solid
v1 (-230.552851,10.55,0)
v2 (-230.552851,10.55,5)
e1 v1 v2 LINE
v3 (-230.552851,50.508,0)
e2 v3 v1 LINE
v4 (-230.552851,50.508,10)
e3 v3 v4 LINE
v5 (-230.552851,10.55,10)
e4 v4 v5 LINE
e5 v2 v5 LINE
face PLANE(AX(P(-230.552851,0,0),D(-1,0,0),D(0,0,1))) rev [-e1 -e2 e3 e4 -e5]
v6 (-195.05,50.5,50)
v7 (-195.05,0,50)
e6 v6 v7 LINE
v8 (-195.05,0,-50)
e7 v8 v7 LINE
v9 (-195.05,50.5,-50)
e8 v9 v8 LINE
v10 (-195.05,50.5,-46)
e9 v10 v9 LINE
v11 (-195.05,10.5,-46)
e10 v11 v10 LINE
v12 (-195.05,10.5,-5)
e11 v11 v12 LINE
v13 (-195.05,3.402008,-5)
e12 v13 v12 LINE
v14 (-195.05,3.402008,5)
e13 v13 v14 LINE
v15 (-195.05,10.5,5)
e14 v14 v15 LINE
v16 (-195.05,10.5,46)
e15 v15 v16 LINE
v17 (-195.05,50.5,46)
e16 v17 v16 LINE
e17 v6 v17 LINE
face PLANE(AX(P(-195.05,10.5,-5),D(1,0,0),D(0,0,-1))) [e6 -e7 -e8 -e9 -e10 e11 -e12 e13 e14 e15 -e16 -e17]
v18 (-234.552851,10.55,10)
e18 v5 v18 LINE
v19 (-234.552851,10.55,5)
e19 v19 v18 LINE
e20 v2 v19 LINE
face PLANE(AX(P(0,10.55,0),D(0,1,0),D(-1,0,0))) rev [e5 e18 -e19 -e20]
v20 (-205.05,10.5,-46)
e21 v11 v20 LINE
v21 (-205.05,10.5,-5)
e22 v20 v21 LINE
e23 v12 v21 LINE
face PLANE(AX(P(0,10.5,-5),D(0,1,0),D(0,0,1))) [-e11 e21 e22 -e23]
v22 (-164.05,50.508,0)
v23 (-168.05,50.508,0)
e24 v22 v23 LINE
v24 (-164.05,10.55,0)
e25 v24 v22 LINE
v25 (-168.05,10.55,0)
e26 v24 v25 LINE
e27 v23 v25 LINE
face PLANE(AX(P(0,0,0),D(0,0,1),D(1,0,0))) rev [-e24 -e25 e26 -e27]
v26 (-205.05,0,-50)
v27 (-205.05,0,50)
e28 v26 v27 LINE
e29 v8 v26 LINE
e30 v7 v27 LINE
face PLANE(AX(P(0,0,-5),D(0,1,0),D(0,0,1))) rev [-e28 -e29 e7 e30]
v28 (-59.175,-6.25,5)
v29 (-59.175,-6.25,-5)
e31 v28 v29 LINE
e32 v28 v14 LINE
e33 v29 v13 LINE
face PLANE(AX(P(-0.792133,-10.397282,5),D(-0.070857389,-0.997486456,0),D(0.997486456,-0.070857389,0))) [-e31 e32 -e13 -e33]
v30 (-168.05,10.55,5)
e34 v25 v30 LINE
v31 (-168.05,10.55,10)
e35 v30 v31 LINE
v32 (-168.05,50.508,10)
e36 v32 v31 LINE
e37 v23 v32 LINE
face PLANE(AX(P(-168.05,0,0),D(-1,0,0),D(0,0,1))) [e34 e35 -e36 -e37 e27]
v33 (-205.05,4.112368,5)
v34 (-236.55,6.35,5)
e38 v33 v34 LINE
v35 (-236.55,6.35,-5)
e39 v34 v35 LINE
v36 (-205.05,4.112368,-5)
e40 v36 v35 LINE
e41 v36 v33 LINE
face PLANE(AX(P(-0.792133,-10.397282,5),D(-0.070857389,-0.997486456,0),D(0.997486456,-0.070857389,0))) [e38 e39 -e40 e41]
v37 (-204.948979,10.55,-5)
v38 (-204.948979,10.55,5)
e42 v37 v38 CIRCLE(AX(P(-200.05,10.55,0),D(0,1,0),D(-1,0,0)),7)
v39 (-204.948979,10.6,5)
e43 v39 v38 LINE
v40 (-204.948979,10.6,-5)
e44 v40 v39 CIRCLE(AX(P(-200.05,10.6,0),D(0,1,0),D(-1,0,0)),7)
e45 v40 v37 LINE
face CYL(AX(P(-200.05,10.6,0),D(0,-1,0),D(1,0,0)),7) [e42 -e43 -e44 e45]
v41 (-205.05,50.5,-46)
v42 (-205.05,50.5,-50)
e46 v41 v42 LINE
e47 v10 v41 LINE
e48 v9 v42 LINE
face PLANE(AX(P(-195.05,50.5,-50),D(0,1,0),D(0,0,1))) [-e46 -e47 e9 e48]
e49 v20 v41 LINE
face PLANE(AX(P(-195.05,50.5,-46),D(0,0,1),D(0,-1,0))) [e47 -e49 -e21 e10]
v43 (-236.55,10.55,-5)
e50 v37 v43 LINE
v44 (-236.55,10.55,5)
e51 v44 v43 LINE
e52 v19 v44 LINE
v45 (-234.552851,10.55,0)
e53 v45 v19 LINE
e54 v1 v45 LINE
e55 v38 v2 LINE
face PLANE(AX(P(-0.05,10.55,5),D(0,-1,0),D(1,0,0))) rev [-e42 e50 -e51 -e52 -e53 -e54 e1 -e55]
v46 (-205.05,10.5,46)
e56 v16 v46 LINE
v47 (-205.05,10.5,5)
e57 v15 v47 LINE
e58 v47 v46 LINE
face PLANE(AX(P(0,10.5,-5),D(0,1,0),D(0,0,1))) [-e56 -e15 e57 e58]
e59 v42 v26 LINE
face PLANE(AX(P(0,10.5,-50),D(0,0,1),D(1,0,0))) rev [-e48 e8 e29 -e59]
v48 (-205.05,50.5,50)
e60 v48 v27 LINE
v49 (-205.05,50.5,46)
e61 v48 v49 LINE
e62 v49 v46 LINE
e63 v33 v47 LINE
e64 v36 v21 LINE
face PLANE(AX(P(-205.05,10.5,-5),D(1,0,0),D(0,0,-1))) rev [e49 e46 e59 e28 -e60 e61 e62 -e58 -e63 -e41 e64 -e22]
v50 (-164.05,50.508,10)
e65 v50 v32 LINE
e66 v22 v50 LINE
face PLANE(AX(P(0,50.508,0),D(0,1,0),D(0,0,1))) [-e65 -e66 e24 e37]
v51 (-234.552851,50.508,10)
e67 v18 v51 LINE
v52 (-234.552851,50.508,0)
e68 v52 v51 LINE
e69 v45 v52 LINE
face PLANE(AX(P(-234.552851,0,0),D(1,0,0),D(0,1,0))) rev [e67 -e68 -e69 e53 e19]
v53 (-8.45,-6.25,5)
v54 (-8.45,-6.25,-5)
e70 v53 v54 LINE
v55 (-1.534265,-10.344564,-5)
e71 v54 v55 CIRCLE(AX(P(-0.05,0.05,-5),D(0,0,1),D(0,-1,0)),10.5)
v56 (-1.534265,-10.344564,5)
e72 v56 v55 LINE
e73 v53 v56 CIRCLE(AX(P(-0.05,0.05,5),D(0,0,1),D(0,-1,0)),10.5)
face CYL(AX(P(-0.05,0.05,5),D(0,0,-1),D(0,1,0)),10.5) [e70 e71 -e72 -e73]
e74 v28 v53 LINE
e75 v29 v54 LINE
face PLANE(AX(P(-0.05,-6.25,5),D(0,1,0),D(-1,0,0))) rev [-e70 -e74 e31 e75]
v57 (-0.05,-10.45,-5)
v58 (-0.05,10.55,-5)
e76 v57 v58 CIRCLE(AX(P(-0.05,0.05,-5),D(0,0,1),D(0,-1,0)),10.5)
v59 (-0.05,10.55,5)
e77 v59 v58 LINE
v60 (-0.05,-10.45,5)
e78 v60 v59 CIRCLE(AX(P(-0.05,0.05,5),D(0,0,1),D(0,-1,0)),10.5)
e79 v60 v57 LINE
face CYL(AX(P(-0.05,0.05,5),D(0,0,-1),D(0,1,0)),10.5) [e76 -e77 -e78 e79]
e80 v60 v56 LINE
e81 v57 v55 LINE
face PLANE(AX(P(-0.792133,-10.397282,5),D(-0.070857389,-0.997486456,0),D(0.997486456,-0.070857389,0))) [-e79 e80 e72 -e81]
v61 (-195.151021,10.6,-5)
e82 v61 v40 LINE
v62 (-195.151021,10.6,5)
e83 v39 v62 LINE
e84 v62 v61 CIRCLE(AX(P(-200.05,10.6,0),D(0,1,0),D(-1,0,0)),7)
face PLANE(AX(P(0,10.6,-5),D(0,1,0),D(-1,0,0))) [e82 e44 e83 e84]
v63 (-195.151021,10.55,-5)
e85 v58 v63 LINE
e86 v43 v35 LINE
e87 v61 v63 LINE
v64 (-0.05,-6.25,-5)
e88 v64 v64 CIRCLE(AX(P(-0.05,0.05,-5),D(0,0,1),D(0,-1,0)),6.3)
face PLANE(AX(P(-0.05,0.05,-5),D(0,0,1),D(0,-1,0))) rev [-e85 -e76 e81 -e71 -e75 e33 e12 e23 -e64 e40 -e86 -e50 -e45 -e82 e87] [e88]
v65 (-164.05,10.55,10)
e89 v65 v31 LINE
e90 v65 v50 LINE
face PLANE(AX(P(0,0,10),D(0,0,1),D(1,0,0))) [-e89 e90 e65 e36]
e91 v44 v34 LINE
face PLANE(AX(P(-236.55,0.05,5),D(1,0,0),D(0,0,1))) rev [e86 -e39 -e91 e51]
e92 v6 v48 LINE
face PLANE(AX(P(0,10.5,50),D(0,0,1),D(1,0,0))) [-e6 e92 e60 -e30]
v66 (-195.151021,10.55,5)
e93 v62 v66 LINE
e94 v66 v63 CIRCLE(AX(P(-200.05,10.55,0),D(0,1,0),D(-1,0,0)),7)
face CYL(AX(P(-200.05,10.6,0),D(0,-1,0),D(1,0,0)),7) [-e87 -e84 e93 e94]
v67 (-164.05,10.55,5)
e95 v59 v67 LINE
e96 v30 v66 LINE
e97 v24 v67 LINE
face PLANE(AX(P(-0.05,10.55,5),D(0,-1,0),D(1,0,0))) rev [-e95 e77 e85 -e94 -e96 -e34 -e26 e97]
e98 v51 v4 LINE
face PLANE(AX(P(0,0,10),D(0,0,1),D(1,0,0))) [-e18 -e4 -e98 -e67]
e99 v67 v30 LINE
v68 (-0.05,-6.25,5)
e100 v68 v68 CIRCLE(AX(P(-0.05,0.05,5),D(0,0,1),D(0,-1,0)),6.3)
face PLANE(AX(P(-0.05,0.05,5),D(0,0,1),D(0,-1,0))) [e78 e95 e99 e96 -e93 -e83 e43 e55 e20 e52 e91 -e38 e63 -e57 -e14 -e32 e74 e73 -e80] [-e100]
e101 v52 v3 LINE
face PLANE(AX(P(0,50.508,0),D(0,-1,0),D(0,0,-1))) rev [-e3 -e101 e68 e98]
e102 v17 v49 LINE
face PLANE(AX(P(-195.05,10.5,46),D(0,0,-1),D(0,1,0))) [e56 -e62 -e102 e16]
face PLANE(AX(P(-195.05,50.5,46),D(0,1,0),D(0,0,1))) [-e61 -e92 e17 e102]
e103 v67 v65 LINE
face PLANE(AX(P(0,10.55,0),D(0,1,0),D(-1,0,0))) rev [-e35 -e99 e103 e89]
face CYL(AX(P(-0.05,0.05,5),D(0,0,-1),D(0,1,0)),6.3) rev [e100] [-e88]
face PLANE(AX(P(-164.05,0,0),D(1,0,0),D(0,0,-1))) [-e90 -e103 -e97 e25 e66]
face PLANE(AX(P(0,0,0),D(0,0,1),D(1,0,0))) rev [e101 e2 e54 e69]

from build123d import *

# Parameters (mm, degrees)
SKETCH1_R             = 6.3
BOSS_EXTRUDE2_DEPTH   = 10
BODY_MOVE_COPY1_ANGLE = 90
BOSS_EXTRUDE4_DEPTH   = 10.5
BOSS_EXTRUDE5_DEPTH   = 0.05
SKETCH5_W             = 4
SKETCH5_H             = 39.958
BOSS_EXTRUDE6_DEPTH   = 10
SKETCH6_W             = 4
SKETCH6_H             = 40
BOSS_EXTRUDE7_DEPTH   = 10


with BuildPart() as part:
    # Sketch1 → Boss-Extrude2 (new body)
    with BuildSketch(Plane.XY):
        with BuildLine():
            Line((10.394563839, -1.484265), (10.5, 0))
            ThreePointArc((10.5, 0), (0, 10.5), (-10.5, 0))
            Line((-10.5, 0), (-10.5, -236.5))
            Line((-10.5, -236.5), (-6.3, -236.5))
            Line((-6.3, -236.5), (6.3, -59.125))
            Line((6.3, -59.125), (6.3, -8.4))
            ThreePointArc((6.3, -8.4), (9.035151526, -5.349395938), (10.394563839, -1.484265))
        make_face()
        Circle(SKETCH1_R, mode=Mode.SUBTRACT)
    extrude(amount=BOSS_EXTRUDE2_DEPTH)


with BuildPart() as part_1:
    # Body-Move/Copy1: moved
    add(part.part.rotate(Axis((-34.8, -34.75, 0), (0, 0, -1)), BODY_MOVE_COPY1_ANGLE))


with BuildPart() as part_2:
    # Body-Move/Copy2: moved
    add(part_1.part.moved(Location((0, 69.6, 0))))

    # Sketch3 → Boss-Extrude4 (add)
    with BuildSketch(Plane(origin=(0, 0, 0), x_dir=(1, 0, 0), z_dir=(0, 1, 0))):
        Polygon((-195.05, -55), (-195.05, -5), (-195.05, 45), (-205.05, 45), (-205.05, -45), (-205.05, -55), align=None)
    extrude(amount=BOSS_EXTRUDE4_DEPTH)

    # Sketch4 → Boss-Extrude5 (add)
    with BuildSketch(Plane(origin=(0, 10.55, 0), x_dir=(1, 0, 0), z_dir=(0, 1, 0))):
        with BuildLine():
            ThreePointArc((-195.151020514, -10), (-193.596595612, -7.711747002), (-193.05, -5))
            ThreePointArc((-193.05, -5), (-193.596595612, -2.288252998), (-195.151020514, 0))
            Line((-195.151020514, 0), (-204.948979486, 0))
            ThreePointArc((-204.948979486, 0), (-207.05, -5), (-204.948979486, -10))
            Line((-204.948979486, -10), (-195.151020514, -10))
        make_face()
    extrude(amount=BOSS_EXTRUDE5_DEPTH)


with BuildPart() as part_3:
    # Body-Move/Copy4: moved
    add(part_2.part.moved(Location((0, 0, -5))))

    # Sketch5 → Boss-Extrude6 (add)
    with BuildSketch(Plane.XY.offset(10)):
        with Locations((-166.05, 30.529)):
            Rectangle(SKETCH5_W, SKETCH5_H)
        with Locations((-232.552850517, 30.529)):
            Rectangle(SKETCH5_W, SKETCH5_H)
    extrude(amount=-BOSS_EXTRUDE6_DEPTH)

    # Sketch6 → Boss-Extrude7 (add)
    with BuildSketch(Plane.ZY.offset(205.05)):
        with Locations((-48, 30.5)):
            Rectangle(SKETCH6_W, SKETCH6_H)
        with Locations((48, 30.5)):
            Rectangle(SKETCH6_W, SKETCH6_H)
    extrude(amount=-BOSS_EXTRUDE7_DEPTH)


solid = part_3.part
